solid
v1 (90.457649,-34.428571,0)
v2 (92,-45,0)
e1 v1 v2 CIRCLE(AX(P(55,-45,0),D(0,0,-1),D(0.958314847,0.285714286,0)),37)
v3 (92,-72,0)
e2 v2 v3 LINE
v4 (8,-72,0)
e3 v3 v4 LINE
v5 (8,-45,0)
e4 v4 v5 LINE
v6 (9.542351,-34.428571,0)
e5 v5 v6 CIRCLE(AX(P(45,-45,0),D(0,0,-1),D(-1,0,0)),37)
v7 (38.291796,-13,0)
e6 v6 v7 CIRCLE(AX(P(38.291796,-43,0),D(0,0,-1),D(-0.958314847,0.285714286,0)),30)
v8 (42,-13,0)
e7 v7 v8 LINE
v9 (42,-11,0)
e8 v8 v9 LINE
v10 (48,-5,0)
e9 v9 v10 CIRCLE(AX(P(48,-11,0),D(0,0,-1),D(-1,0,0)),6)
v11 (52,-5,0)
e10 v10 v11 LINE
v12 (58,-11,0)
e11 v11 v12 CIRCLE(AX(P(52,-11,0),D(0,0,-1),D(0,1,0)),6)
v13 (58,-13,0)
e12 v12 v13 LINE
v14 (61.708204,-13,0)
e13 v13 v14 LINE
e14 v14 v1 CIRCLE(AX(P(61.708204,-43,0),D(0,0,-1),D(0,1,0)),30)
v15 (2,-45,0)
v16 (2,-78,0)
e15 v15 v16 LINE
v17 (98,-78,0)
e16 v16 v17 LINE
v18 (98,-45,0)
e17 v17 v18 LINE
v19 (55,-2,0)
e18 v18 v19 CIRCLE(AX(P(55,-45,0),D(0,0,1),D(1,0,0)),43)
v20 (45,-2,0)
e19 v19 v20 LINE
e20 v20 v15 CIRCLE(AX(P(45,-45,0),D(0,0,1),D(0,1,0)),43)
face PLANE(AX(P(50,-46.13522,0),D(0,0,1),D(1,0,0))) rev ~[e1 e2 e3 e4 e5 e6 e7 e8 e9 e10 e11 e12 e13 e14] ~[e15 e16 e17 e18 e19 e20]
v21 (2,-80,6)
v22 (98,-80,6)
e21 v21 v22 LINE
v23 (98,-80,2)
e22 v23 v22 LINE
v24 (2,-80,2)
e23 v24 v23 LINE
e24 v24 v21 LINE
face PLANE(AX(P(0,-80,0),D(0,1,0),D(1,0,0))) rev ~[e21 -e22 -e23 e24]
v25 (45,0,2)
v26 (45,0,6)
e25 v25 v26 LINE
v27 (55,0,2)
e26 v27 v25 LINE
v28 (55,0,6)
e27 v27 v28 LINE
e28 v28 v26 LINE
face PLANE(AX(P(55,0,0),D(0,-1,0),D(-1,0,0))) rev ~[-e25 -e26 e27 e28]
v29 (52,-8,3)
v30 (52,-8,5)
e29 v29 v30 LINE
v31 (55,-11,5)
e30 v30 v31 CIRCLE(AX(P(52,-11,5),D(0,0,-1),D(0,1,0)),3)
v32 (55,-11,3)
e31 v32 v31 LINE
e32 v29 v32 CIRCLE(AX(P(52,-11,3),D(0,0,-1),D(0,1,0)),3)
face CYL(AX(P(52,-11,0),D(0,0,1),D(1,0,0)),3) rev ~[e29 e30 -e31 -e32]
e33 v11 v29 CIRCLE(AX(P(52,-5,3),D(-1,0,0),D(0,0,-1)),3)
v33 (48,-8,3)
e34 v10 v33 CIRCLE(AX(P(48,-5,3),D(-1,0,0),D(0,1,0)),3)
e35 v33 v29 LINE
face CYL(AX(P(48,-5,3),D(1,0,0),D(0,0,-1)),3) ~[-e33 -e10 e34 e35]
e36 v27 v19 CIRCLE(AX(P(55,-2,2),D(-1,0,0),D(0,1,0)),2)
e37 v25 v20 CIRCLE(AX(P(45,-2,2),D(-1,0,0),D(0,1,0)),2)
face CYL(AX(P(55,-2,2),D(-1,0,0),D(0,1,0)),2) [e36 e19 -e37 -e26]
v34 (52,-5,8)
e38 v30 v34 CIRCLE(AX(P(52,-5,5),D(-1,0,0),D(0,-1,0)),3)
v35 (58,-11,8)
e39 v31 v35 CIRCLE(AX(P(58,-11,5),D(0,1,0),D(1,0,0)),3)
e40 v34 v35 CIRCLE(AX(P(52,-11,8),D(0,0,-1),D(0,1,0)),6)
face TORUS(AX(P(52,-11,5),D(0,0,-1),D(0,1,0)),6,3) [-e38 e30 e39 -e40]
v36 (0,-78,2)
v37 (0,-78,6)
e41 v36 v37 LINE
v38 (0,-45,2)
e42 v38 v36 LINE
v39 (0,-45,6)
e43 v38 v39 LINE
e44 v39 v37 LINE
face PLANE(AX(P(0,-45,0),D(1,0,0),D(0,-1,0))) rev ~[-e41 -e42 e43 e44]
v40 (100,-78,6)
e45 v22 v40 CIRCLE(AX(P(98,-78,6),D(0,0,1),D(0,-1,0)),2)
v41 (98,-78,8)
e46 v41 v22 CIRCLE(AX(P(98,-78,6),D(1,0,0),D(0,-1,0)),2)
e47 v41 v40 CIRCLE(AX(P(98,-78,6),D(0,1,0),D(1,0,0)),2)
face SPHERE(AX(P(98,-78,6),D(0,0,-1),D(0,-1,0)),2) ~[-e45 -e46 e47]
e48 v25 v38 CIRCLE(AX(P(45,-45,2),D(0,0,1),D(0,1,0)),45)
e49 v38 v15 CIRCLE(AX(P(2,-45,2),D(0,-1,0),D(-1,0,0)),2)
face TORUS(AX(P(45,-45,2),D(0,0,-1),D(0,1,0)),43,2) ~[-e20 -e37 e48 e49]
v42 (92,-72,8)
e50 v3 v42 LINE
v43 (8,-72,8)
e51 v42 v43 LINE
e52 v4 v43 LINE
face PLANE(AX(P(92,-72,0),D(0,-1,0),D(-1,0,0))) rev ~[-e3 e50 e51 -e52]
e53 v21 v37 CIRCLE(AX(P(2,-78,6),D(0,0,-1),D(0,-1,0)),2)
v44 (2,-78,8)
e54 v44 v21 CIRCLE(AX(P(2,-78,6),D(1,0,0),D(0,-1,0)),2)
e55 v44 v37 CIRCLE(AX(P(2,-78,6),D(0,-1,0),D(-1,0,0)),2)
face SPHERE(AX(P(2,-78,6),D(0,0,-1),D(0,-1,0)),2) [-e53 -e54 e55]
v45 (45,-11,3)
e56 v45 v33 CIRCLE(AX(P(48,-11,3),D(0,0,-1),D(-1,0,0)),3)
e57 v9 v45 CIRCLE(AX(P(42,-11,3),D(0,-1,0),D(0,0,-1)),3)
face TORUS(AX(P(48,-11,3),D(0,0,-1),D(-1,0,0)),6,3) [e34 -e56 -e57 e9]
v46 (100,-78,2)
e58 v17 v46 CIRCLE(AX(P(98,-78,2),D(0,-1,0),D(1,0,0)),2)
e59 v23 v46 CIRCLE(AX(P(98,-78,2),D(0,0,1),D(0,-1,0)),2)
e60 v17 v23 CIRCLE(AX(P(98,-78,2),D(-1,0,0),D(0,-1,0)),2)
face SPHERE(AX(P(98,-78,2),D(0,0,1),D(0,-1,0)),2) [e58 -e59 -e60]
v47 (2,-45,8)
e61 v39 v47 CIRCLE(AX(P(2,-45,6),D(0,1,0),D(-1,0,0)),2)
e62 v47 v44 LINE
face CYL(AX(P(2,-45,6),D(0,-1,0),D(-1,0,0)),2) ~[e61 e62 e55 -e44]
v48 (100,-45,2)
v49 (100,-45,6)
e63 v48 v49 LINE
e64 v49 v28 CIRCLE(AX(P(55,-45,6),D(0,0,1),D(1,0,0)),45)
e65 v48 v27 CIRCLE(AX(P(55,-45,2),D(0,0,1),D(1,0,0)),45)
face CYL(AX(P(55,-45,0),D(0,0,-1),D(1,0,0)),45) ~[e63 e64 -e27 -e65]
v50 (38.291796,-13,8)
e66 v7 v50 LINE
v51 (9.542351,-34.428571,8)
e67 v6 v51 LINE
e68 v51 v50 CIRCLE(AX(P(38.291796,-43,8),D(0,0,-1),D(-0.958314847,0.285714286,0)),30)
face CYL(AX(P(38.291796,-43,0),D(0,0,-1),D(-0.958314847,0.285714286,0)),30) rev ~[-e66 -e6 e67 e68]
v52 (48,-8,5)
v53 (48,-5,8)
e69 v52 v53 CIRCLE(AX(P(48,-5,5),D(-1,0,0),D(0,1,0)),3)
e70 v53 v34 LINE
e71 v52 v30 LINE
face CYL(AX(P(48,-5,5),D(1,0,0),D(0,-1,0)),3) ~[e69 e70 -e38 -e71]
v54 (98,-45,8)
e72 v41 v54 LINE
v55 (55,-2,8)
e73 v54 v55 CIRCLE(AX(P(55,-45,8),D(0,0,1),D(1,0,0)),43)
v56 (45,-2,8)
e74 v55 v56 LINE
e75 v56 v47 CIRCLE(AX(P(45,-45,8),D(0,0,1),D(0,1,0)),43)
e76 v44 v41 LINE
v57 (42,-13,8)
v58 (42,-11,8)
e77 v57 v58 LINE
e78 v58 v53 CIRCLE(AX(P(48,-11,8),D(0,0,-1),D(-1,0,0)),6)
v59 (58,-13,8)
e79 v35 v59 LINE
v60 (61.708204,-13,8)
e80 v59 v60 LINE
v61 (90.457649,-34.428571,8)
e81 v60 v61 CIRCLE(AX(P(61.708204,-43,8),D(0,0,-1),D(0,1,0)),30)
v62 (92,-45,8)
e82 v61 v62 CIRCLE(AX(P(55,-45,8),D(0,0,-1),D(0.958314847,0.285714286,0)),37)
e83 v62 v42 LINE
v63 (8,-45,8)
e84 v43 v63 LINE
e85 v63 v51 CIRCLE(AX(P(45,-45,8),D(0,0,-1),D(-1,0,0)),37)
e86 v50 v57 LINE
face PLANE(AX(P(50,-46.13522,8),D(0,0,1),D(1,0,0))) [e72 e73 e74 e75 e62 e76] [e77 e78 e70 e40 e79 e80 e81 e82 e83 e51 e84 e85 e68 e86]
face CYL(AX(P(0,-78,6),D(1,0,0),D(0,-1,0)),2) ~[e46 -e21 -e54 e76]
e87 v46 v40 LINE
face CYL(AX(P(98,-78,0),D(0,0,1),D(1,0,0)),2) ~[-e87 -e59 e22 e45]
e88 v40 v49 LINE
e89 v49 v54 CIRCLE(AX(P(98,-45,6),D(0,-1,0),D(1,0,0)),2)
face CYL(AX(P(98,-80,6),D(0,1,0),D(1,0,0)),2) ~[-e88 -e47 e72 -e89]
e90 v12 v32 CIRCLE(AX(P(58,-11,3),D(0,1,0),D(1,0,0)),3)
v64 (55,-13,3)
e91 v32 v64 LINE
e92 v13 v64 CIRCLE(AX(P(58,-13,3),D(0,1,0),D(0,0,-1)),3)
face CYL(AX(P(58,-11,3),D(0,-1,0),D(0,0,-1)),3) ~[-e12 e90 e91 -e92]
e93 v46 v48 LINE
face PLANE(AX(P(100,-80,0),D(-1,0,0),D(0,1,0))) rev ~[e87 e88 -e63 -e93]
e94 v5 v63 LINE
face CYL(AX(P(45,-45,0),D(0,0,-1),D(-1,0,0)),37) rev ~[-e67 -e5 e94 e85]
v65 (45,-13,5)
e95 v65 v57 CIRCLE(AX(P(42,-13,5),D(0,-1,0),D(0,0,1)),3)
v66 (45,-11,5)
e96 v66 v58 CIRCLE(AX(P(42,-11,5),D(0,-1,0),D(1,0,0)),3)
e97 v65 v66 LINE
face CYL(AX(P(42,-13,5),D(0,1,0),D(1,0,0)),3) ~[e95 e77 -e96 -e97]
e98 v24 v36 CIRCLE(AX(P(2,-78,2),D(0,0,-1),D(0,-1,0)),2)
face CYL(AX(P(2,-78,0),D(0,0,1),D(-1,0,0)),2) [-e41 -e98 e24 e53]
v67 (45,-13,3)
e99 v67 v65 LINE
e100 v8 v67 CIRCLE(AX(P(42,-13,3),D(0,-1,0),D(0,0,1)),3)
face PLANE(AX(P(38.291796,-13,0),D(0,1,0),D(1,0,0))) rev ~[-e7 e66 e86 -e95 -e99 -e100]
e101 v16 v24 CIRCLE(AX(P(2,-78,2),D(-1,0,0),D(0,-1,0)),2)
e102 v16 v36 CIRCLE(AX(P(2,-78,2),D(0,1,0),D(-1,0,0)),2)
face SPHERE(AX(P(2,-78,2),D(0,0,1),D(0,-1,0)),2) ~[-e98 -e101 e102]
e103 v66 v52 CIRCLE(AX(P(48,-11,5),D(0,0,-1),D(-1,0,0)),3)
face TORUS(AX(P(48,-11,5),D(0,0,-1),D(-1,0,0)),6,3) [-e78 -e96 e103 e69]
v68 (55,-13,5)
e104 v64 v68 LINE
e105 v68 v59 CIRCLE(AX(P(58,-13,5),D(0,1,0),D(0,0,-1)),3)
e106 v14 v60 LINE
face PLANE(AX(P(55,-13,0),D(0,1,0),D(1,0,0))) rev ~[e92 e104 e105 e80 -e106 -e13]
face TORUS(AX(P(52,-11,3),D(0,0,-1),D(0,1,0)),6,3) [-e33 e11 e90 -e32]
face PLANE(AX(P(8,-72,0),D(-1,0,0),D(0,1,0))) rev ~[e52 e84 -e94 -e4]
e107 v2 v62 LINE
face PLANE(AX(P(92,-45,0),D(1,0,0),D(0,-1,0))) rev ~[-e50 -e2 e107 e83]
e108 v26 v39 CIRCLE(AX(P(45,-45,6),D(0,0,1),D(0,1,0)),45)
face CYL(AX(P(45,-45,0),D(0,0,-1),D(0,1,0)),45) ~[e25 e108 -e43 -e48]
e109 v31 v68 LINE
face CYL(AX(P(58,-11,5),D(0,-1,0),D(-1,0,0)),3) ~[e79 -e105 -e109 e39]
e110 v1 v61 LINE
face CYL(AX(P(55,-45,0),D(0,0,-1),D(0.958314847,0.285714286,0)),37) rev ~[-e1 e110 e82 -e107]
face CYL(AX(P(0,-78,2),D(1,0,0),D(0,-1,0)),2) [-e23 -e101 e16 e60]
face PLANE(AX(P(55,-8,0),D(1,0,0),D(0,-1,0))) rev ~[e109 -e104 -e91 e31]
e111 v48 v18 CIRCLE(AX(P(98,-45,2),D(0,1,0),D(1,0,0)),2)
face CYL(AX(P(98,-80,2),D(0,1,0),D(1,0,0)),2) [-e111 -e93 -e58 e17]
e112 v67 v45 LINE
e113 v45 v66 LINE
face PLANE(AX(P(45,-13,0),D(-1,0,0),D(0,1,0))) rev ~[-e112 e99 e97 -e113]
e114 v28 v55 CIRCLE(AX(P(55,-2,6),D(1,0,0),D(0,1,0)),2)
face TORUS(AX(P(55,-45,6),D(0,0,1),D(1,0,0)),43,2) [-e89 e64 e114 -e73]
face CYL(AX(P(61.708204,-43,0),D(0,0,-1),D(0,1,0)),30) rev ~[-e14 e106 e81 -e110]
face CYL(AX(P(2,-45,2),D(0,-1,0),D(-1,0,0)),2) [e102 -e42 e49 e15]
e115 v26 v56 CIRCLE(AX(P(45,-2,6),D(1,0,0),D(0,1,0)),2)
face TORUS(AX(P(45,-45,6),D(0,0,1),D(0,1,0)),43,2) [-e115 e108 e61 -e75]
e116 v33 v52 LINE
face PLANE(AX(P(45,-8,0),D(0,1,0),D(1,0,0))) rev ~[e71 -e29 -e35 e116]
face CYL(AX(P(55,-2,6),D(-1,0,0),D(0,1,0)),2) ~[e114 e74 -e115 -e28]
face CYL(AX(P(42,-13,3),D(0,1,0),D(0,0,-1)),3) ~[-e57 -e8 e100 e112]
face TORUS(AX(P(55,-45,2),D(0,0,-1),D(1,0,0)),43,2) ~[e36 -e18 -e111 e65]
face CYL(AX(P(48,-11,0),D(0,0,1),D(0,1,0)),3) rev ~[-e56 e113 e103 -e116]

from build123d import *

# Parameters (mm, degrees)
F1_DEPTH = 8
F2_R     = 2
F3_F1_R  = 3
F3_F2_R  = 3


with BuildPart() as f1:
    # F0 (on Top) → F1 (new body)
    with BuildSketch(Plane.XY):
        with BuildLine():
            Line((55, 0), (45, 0))
            ThreePointArc((45, 0), (13.1801948466, -13.1801948466), (0, -45))
            Line((0, -45), (0, -80))
            Line((0, -80), (100, -80))
            Line((100, -80), (100, -45))
            ThreePointArc((100, -45), (86.8198051534, -13.1801948466), (55, 0))
        make_face()
        with BuildLine():
            Line((45, -13), (45, -8))
            Line((45, -8), (55, -8))
            Line((55, -8), (55, -13))
            Line((55, -13), (61.7082039325, -13))
            ThreePointArc((61.7082039325, -13), (79.6366330725, -18.9464882279), (90.4576493575, -34.4285714286))
            ThreePointArc((90.4576493575, -34.4285714286), (91.6123819645, -39.6583254605), (92, -45))
            Line((92, -45), (92, -72))
            Line((92, -72), (8, -72))
            Line((8, -72), (8, -45))
            ThreePointArc((8, -45), (8.3876180355, -39.6583254605), (9.5423506425, -34.4285714286))
            ThreePointArc((9.5423506425, -34.4285714286), (20.3633669275, -18.9464882279), (38.2917960675, -13))
            Line((38.2917960675, -13), (45, -13))
        make_face(mode=Mode.SUBTRACT)
    extrude(amount=F1_DEPTH)

    # F2
    f2_edges = [f1.edges().sort_by_distance(p)[0] for p in [
        (0, -80, 4),
        (100, -80, 4),
        (50, -80, 8),
        (0, -62.5, 8),
        (50, -80, 0),
        (86.819805, -13.180195, 0),
    ]]
    fillet(f2_edges, radius=F2_R)

    # F3: fillet of radius 3 on 4 edges, made by hand

    # F3_f1
    f3_f1_edges = [f1.edges().sort_by_distance(p)[0] for p in [
        (45, -8, 4),
        (55, -8, 4),
    ]]
    fillet(f3_f1_edges, radius=F3_F1_R)

    # F3_f2
    f3_f2_edges = [f1.edges().sort_by_distance(p)[0] for p in [
        (50, -8, 0),
        (50, -8, 8),
        (45.8786796564, -8.8786796564, 8),
        (54.1213203436, -8.8786796564, 8),
        (45.8786796564, -8.8786796564, 0),
        (54.1213203436, -8.8786796564, 0),
    ]]
    fillet(f3_f2_edges, radius=F3_F2_R)


solid = f1.part
